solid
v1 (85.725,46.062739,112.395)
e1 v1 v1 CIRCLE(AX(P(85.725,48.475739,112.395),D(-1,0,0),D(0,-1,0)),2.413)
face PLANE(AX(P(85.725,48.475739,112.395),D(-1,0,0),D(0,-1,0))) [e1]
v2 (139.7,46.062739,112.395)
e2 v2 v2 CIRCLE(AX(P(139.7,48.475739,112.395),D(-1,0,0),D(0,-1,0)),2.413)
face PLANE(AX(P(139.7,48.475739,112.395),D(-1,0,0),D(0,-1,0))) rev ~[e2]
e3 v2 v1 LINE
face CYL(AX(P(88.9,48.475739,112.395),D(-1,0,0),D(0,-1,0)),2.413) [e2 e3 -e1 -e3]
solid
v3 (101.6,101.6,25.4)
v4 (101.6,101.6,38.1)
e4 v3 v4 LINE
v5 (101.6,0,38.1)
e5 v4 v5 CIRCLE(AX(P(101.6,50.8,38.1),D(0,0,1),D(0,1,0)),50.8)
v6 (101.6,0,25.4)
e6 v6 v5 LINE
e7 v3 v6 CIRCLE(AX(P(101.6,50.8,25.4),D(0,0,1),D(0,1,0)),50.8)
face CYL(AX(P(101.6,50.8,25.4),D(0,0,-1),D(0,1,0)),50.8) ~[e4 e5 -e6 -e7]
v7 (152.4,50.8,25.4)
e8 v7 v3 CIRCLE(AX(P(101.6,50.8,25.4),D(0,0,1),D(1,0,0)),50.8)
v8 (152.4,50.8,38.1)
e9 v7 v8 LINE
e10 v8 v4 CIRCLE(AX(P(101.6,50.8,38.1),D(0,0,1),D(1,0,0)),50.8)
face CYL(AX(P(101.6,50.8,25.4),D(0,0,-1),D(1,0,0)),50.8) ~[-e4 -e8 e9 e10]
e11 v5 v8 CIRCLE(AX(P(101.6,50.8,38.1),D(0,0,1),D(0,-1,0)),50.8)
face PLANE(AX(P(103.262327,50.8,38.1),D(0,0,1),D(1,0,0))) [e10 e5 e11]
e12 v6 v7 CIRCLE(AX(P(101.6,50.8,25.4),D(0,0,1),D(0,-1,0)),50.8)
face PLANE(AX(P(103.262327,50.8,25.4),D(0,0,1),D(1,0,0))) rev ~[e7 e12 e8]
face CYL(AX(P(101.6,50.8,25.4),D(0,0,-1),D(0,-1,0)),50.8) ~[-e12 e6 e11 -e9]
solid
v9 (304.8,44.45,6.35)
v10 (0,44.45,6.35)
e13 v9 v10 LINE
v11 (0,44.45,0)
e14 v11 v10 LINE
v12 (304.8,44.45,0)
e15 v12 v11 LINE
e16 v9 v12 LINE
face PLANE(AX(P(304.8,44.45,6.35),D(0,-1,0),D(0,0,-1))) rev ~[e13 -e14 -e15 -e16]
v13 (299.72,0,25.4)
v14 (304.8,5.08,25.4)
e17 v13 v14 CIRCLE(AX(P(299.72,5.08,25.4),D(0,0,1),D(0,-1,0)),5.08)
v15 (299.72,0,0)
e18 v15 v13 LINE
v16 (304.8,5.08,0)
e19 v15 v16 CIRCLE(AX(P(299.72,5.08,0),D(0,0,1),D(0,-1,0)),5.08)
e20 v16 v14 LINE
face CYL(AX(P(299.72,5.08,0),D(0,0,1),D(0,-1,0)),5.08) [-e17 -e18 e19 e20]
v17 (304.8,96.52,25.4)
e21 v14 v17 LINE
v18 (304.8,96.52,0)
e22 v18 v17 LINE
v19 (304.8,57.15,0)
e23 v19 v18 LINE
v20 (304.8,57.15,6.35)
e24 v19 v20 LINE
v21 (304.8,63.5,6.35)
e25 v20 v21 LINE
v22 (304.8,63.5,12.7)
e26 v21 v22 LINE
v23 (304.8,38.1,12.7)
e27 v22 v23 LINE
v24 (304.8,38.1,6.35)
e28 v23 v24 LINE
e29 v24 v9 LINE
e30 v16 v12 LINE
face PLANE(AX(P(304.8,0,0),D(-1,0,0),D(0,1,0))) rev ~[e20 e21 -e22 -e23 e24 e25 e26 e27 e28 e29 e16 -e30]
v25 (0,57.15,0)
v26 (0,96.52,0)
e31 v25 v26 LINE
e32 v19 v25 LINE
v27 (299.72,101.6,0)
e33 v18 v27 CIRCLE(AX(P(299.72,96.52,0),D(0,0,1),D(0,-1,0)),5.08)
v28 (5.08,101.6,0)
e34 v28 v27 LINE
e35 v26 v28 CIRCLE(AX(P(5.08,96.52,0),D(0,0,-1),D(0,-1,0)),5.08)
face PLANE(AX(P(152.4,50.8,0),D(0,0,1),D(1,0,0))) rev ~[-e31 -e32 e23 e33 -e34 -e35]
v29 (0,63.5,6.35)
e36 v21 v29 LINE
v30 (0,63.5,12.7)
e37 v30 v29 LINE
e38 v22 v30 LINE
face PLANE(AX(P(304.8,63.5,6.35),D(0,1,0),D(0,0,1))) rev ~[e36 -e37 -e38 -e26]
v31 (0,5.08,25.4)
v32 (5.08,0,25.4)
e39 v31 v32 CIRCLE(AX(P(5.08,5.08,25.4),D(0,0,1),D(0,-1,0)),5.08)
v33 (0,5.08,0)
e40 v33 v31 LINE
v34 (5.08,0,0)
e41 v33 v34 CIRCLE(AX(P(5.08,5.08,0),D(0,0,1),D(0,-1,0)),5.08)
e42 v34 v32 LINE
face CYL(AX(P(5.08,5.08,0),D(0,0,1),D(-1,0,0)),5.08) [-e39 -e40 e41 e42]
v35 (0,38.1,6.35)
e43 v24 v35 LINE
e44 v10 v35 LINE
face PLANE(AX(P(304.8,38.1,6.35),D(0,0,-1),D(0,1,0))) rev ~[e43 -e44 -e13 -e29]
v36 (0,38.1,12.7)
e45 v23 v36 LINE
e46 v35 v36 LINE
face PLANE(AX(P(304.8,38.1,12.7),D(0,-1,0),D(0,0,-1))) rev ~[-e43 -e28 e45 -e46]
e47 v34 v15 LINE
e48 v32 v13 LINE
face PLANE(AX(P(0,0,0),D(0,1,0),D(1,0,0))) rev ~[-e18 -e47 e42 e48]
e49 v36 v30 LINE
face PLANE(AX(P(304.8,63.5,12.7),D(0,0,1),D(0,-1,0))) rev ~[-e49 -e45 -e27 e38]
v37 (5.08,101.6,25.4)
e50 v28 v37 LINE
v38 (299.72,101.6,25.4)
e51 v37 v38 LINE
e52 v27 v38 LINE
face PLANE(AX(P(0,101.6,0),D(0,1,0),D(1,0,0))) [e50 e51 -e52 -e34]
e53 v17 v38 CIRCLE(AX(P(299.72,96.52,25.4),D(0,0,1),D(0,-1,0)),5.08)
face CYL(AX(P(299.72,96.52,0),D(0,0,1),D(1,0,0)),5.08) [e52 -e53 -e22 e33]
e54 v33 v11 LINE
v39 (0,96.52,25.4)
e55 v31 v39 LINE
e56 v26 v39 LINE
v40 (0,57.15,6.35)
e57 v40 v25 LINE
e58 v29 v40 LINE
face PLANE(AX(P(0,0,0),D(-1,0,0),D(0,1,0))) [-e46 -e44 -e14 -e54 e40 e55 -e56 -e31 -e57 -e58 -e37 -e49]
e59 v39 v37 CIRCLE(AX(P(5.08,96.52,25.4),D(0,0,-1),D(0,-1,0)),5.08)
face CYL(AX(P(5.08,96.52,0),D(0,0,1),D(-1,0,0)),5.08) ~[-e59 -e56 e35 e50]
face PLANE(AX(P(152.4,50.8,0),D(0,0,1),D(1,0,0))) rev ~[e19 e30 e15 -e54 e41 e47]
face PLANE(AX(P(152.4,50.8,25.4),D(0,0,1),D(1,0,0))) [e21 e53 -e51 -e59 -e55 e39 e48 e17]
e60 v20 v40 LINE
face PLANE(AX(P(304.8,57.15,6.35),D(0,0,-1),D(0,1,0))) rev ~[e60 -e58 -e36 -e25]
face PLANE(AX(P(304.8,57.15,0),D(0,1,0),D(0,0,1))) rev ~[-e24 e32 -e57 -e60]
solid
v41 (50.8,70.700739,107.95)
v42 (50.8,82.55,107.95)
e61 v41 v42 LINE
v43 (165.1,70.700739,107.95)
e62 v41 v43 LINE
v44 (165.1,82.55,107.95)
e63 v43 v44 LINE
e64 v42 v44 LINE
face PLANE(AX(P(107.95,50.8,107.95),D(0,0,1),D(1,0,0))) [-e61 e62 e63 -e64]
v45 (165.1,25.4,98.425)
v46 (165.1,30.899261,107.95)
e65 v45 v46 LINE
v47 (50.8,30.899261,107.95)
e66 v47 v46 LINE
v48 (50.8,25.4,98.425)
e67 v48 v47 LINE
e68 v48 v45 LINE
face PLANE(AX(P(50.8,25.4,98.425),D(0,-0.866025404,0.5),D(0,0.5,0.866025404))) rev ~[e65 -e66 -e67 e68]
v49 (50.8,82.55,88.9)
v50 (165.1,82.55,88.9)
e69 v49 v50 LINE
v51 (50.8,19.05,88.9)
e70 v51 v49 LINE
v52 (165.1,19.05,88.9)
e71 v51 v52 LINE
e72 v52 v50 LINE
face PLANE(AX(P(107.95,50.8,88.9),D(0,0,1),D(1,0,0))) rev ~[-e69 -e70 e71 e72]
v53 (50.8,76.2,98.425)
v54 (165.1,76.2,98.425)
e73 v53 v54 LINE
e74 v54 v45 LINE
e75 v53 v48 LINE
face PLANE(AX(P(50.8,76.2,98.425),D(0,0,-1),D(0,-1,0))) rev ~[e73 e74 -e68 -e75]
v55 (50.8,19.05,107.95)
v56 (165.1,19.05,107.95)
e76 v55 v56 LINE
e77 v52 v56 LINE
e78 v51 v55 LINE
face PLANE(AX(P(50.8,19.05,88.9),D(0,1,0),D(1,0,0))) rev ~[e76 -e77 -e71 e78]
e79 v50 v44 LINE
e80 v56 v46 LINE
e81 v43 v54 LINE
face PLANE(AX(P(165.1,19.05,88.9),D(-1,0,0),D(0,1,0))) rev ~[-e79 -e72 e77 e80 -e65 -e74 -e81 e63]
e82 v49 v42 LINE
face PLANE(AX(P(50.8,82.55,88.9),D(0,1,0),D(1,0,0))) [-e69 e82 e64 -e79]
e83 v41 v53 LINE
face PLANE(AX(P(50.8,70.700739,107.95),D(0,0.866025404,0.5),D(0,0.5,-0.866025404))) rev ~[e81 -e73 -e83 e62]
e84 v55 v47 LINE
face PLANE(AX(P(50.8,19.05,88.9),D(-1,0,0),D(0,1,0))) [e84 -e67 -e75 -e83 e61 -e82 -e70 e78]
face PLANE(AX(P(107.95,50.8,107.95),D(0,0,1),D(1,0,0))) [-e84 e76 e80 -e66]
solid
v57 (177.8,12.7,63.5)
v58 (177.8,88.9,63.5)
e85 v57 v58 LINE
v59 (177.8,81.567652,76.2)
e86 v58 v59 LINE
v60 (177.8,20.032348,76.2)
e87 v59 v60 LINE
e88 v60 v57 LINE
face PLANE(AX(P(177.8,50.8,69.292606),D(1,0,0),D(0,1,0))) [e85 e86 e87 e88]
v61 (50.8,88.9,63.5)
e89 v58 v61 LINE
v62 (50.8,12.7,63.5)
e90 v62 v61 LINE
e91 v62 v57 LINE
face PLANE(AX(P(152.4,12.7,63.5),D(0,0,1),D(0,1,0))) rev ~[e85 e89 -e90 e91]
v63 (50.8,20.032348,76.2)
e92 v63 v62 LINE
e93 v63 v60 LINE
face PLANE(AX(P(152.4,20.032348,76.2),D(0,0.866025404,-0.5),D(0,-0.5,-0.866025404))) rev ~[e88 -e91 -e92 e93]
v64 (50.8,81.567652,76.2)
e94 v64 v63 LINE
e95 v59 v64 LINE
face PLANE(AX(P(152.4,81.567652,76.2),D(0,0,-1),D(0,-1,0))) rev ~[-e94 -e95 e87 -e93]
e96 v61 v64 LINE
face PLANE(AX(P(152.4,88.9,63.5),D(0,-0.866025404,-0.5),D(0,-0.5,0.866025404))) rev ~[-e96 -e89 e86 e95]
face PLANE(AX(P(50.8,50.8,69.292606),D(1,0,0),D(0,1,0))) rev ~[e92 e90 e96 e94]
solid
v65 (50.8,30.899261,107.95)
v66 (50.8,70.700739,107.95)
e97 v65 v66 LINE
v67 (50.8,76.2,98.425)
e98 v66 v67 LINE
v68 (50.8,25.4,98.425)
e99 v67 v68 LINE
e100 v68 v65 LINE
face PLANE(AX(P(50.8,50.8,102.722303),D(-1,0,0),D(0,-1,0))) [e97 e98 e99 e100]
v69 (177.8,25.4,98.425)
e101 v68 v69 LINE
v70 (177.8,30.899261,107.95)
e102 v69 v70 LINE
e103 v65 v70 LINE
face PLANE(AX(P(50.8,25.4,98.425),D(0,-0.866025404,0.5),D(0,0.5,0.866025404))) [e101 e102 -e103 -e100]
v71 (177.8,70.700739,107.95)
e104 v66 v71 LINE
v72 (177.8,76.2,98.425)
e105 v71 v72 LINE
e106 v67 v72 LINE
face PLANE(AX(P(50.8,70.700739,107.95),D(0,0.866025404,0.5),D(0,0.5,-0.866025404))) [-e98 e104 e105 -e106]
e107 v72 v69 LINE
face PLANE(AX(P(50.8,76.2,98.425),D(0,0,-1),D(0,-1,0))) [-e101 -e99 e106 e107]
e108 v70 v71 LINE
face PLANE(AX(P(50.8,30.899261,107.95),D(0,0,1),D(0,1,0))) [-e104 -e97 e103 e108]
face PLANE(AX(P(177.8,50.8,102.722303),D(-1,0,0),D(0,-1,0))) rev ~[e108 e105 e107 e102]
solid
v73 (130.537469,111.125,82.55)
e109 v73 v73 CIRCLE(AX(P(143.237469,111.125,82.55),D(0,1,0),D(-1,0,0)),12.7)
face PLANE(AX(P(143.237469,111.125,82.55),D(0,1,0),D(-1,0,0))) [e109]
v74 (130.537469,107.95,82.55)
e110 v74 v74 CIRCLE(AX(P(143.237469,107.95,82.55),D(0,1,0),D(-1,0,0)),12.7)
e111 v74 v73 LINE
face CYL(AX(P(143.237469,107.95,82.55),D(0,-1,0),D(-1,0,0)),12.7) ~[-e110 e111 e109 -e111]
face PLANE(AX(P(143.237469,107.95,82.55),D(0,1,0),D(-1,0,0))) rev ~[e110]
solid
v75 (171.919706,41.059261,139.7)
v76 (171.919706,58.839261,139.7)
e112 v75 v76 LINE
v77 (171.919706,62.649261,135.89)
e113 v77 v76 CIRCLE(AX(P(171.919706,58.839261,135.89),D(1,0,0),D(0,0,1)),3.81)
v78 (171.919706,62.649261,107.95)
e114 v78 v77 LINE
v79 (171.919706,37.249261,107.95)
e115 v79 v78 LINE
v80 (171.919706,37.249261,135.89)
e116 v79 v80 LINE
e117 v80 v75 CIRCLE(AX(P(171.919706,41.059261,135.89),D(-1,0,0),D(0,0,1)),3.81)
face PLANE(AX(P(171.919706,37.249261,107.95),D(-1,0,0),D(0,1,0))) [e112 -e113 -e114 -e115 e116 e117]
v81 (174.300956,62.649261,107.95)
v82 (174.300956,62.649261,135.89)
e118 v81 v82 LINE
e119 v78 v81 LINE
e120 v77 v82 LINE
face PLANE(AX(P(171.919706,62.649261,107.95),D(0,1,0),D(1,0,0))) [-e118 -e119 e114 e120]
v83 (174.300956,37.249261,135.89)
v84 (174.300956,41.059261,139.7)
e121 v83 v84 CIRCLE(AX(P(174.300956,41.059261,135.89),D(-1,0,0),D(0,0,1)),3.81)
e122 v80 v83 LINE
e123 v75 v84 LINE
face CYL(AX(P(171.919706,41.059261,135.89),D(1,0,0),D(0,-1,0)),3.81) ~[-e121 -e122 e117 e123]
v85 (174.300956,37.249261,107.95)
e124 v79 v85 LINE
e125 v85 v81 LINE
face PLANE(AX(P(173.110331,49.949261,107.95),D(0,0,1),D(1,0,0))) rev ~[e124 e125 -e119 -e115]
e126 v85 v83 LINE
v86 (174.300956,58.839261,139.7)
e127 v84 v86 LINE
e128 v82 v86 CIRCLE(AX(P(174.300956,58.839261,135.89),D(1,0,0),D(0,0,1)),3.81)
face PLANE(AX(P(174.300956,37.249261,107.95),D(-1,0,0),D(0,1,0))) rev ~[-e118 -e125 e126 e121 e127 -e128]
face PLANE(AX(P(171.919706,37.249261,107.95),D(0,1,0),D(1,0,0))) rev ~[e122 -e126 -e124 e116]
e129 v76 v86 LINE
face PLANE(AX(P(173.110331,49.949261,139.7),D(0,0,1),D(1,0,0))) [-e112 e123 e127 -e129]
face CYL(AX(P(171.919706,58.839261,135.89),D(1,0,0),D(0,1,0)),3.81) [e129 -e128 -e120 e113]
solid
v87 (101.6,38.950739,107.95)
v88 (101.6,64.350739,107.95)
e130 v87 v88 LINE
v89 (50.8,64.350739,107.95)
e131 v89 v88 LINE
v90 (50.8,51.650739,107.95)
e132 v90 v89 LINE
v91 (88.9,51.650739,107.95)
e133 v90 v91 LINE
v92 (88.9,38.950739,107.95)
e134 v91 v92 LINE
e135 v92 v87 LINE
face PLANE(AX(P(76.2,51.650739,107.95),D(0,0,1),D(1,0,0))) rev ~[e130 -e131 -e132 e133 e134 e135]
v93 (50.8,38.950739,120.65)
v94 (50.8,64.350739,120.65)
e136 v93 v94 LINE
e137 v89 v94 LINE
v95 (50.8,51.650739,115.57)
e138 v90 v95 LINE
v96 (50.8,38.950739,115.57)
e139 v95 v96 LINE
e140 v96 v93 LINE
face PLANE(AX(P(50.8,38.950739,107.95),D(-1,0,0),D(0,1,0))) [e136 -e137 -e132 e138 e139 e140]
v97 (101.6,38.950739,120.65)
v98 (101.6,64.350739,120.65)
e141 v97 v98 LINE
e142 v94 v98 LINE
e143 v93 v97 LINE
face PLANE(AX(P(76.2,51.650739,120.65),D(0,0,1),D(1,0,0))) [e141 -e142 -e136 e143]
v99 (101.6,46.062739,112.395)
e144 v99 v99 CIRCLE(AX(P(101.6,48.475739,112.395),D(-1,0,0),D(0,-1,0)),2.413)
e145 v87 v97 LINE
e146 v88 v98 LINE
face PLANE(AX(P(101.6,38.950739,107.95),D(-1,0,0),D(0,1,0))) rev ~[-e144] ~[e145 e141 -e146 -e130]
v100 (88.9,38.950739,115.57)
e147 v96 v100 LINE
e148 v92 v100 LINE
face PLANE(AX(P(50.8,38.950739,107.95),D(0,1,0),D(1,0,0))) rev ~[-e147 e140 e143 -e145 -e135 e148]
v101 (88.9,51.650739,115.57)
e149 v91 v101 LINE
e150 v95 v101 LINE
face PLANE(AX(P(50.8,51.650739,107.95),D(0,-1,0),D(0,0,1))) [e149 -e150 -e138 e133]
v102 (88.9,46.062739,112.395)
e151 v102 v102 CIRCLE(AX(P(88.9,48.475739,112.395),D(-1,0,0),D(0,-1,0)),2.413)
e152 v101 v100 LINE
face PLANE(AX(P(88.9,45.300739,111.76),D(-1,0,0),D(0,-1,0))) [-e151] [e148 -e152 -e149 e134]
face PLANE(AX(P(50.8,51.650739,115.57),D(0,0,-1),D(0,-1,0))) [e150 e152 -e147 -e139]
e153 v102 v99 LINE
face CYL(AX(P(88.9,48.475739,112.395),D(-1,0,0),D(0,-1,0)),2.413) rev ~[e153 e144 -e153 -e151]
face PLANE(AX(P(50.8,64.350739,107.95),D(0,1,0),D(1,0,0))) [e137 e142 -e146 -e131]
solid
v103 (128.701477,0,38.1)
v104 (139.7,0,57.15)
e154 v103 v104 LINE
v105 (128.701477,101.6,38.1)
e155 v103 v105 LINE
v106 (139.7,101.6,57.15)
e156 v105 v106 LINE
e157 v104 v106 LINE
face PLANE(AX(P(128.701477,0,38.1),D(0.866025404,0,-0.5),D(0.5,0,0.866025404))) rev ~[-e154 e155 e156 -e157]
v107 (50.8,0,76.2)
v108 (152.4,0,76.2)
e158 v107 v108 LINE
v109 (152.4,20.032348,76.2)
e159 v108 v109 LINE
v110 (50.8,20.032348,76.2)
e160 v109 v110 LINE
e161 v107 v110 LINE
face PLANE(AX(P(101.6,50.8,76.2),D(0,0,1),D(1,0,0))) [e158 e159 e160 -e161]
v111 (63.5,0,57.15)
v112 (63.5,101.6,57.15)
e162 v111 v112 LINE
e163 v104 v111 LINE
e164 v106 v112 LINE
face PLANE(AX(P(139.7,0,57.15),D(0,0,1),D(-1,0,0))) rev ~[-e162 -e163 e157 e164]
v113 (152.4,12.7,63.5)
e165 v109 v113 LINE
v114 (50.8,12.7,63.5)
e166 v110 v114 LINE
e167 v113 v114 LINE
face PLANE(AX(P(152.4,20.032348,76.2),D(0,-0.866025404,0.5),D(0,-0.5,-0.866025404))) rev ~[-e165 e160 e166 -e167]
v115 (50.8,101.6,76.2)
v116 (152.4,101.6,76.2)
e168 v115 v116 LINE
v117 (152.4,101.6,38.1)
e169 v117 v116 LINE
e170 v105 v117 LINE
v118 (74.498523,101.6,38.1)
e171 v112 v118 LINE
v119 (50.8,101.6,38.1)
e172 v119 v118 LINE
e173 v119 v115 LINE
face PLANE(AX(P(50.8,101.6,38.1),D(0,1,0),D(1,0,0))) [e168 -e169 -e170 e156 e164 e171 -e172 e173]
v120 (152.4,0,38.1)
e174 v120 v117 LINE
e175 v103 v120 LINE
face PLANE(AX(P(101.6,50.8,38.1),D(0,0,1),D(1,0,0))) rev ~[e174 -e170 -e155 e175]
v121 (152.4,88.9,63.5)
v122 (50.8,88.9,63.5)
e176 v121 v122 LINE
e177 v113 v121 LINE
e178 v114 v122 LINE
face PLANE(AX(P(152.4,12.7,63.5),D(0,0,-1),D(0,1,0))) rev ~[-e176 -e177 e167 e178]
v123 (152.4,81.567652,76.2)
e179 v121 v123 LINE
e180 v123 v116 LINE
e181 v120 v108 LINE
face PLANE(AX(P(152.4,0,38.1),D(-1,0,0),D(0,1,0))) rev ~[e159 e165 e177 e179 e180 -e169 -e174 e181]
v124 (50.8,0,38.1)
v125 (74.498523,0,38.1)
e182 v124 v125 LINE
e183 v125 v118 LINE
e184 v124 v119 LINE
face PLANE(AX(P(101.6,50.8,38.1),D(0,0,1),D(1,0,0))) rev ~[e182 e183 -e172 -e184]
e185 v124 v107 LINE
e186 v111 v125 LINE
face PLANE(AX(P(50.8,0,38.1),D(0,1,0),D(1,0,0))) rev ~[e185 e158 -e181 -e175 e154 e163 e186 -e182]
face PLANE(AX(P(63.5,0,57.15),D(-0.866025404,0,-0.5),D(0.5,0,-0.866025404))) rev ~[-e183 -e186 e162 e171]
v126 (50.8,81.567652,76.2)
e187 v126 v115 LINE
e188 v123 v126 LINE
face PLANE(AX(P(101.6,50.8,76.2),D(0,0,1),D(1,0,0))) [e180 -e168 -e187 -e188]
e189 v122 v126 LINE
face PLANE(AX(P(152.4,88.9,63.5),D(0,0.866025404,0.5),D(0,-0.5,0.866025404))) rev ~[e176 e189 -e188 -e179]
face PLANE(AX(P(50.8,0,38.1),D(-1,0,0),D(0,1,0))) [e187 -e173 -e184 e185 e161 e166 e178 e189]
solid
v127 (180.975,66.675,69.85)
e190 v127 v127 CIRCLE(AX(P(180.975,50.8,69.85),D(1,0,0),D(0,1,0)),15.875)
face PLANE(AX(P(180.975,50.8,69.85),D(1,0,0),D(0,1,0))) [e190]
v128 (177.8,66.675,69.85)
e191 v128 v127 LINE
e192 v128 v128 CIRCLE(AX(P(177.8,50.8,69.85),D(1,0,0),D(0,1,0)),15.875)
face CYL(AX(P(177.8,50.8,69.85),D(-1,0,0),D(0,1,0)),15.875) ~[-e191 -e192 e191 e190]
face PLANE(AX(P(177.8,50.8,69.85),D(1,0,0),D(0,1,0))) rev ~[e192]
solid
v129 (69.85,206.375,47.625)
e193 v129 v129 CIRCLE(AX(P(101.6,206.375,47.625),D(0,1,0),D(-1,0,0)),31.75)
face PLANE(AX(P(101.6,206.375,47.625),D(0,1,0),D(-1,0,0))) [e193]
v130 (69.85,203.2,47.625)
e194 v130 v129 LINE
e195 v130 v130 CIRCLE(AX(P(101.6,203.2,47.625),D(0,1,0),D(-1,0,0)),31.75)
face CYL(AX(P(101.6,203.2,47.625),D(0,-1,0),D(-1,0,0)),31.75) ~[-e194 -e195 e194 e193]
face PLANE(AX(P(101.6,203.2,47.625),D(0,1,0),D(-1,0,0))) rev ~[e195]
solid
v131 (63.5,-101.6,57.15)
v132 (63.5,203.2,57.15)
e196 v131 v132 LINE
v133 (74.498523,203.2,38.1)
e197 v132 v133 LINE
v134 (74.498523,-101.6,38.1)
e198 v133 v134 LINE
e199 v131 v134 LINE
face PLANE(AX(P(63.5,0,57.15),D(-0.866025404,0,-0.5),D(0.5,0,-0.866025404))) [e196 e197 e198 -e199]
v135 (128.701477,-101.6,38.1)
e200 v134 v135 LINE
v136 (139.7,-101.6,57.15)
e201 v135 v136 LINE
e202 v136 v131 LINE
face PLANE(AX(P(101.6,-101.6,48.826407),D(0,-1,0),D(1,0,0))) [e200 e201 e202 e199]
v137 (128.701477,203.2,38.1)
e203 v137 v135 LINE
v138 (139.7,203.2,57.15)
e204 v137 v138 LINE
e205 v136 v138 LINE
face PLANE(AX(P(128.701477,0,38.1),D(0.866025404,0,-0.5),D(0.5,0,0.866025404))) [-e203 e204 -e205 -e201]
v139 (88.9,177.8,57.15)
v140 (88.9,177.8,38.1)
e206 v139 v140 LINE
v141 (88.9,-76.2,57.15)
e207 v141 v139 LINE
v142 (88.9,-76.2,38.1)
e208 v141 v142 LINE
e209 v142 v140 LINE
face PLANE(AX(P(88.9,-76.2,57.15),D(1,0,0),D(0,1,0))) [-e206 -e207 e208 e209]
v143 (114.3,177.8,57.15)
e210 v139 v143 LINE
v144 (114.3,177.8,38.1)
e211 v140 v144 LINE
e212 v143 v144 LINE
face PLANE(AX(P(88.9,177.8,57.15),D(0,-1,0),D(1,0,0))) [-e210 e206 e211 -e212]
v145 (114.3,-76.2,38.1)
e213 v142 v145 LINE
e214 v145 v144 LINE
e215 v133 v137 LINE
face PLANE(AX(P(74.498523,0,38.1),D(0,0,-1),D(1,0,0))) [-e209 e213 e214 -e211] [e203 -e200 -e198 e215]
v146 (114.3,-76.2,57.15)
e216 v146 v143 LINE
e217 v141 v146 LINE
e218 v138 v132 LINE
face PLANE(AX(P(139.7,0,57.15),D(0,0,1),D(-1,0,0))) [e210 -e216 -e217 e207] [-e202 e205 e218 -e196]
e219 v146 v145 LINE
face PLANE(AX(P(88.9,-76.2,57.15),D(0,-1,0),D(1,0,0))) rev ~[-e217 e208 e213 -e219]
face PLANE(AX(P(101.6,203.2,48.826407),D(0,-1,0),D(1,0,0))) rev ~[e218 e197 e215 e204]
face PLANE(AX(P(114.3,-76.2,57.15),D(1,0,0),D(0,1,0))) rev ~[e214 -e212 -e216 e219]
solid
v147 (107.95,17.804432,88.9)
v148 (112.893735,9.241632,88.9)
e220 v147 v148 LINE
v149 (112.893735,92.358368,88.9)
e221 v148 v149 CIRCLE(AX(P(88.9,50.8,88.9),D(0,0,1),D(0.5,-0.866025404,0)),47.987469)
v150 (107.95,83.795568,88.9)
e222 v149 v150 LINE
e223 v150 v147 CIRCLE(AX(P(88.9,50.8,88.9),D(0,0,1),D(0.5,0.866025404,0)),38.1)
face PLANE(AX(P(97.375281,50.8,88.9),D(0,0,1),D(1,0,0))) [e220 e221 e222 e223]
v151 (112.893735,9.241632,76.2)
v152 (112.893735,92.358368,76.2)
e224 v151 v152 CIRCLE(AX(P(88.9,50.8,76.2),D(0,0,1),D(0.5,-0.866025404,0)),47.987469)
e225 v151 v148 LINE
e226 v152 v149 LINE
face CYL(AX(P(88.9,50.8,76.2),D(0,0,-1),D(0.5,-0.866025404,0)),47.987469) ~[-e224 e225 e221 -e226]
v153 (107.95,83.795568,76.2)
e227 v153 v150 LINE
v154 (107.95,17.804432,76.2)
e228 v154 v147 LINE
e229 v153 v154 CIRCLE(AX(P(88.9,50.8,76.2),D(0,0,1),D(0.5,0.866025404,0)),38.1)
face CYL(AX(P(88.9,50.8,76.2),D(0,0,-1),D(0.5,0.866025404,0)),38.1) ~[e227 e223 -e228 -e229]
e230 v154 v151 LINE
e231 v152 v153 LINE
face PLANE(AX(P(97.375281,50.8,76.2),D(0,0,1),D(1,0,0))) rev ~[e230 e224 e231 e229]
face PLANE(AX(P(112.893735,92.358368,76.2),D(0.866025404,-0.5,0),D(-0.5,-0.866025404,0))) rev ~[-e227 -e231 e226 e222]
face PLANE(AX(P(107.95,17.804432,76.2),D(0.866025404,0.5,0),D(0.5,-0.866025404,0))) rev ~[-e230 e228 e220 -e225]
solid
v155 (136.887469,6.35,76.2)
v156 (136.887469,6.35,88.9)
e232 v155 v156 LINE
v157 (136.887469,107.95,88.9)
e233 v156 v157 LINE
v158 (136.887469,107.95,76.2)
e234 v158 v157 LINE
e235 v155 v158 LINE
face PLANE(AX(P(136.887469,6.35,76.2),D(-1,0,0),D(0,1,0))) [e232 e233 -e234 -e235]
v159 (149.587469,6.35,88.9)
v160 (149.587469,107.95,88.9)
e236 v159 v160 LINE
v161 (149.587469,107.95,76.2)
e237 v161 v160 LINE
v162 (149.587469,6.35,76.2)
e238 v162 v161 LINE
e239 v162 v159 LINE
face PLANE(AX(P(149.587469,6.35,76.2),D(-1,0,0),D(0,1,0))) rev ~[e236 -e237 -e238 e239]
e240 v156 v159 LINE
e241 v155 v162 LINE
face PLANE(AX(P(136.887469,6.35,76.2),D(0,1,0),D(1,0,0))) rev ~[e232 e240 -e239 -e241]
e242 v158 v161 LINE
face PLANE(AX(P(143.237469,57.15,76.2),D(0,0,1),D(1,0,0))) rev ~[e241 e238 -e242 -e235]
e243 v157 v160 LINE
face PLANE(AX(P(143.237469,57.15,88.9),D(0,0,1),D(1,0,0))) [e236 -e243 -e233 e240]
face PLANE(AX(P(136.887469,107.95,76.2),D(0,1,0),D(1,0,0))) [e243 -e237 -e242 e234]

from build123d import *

# Parameters (mm, degrees)
F0_W           = 304.8
F0_H           = 101.6
F1_DEPTH       = 25.4
F2_R           = 5.08
F4_DEPTH       = 304.801
F6_DEPTH       = 12.7
F7_W           = 101.6
F7_H           = 101.6
F8_DEPTH       = 38.1
F10_DEPTH      = 101.6
F12_DEPTH      = 101.6
F13_DEPTH      = 101.6
F14_DEPTH      = 203.2
F15_W          = 25.4
F15_H          = 254
F16_DEPTH      = 19.05
F17_R          = 31.75
F18_DEPTH      = 3.175
F19_DEPTH      = 101.6
F19_DEPTH_BACK = 25.4
F20_R          = 15.875
F21_DEPTH      = 3.175
F23_DEPTH      = 12.7
F24_W          = 12.7
F24_H          = 101.6
F25_DEPTH      = 12.7
F26_R          = 12.7
F27_DEPTH      = 3.175
F28_W          = 114.3
F28_H          = 63.5
F29_DEPTH      = 19.05
F31_DEPTH      = 114.3
F32_DEPTH      = 127
F33_W          = 50.8
F33_H          = 25.4
F34_DEPTH      = 12.7
F35_W          = 12.7
F35_H          = 7.62
F36_DEPTH      = 38.1
F37_R          = 2.413
F38_DEPTH      = 12.7
F39_DEPTH      = 3.175
F39_DEPTH_BACK = 50.8
F40_W          = 2.38125
F40_H          = 25.4
F41_DEPTH      = 31.75
F42_R          = 3.81


with BuildPart() as f1:
    # F0 (on Top) → F1 (new body)
    with BuildSketch(Plane.XY):
        with Locations((152.4, 50.8)):
            Rectangle(F0_W, F0_H)
    extrude(amount=F1_DEPTH)

    # F2
    f2_edges = [f1.edges().sort_by_distance(p)[0] for p in [
        (0, 0, 12.7),
        (304.8, 0, 12.7),
        (304.8, 101.6, 12.7),
        (0, 101.6, 12.7),
    ]]
    fillet(f2_edges, radius=F2_R)

    # F3 (on face) → F4 (cut, through all)
    with BuildSketch(Plane.YZ.offset(304.8)):
        Polygon((44.45, 6.35), (44.45, 0), (57.15, 0), (57.15, 6.35), (63.5, 6.35), (63.5, 12.7), (38.1, 12.7), (38.1, 6.35), align=None)
    extrude(amount=-F4_DEPTH, mode=Mode.SUBTRACT)


with BuildPart() as f6:
    # F5 (on face) → F6 (new body)
    with BuildSketch(Plane.XY.offset(25.4)):
        with BuildLine():
            ThreePointArc((101.6, 0), (137.5210244843, 14.8789755157), (152.4, 50.8))
            ThreePointArc((152.4, 50.8), (137.5210244843, 86.7210244843), (101.6, 101.6))
            ThreePointArc((101.6, 101.6), (50.8, 50.8), (101.6, 0))
        make_face()
    extrude(amount=F6_DEPTH)


with BuildPart() as f8:
    # F7 (on face) → F8 (new body)
    with BuildSketch(Plane.XY.offset(38.1)):
        with Locations((101.6, 50.8)):
            Rectangle(F7_W, F7_H)
    extrude(amount=F8_DEPTH)

    # F9 (on face) → F10 (cut, through all)
    with BuildSketch(Plane.XZ):
        Polygon((63.5, 57.15), (74.4985226281, 38.1), (128.7014773719, 38.1), (139.7, 57.15), align=None)
    extrude(amount=-F10_DEPTH, mode=Mode.SUBTRACT)

    # F11 (on face) → F12 (cut, through all)
    with BuildSketch(Plane.YZ.offset(152.4)):
        Polygon((81.5676515813, 76.2), (20.0323484187, 76.2), (12.7, 63.5), (88.9, 63.5), align=None)
    extrude(amount=-F12_DEPTH, mode=Mode.SUBTRACT)


with BuildPart() as f13:
    # F9 (on face) → F13 (new body)
    with BuildSketch(Plane.XZ):
        Polygon((63.5, 57.15), (74.4985226281, 38.1), (128.7014773719, 38.1), (139.7, 57.15), align=None)
    extrude(amount=F13_DEPTH)

    # F9 (on face) → F14 (join)
    with BuildSketch(Plane.XZ):
        Polygon((63.5, 57.15), (74.4985226281, 38.1), (128.7014773719, 38.1), (139.7, 57.15), align=None)
    extrude(amount=-F14_DEPTH)

    # F15 (on face) → F16 (cut, through all)
    with BuildSketch(Plane.XY.offset(57.15)):
        with Locations((101.6, 50.8)):
            Rectangle(F15_W, F15_H)
    extrude(amount=-F16_DEPTH, mode=Mode.SUBTRACT)


with BuildPart() as f18:
    # F17 (on face) → F18 (new body)
    with BuildSketch(Plane(origin=(0, 203.2, 0), x_dir=(-1, 0, 0), z_dir=(0, 1, 0))):
        with Locations((-101.6, 47.625)):
            Circle(F17_R)
    extrude(amount=F18_DEPTH)


with BuildPart() as f19:
    # F11 (on face) → F19 (new body, two sides)
    with BuildSketch(Plane.YZ.offset(152.4)) as f19_sk:
        Polygon((81.5676515813, 76.2), (20.0323484187, 76.2), (12.7, 63.5), (88.9, 63.5), align=None)
    extrude(amount=-F19_DEPTH)
    extrude(f19_sk.sketch, amount=F19_DEPTH_BACK)


with BuildPart() as f21:
    # F20 (on face) → F21 (new body)
    with BuildSketch(Plane.YZ.offset(177.8)):
        with Locations((50.8, 69.85)):
            Circle(F20_R)
    extrude(amount=F21_DEPTH)


with BuildPart() as f23:
    # F22 (on face) → F23 (new body)
    with BuildSketch(Plane.XY.offset(76.2)):
        with BuildLine():
            Line((112.893734675, 92.3583675204), (107.95, 83.7955678842))
            ThreePointArc((107.95, 83.7955678842), (50.8, 50.8), (107.95, 17.8044321158))
            Line((107.95, 17.8044321158), (112.893734675, 9.2416324796))
            ThreePointArc((112.893734675, 9.2416324796), (136.8874693499, 50.8), (112.893734675, 92.3583675204))
        make_face()
    extrude(amount=F23_DEPTH)


with BuildPart() as f25:
    # F24 (on face) → F25 (new body)
    with BuildSketch(Plane.XY.offset(76.2)):
        with Locations((143.2374693499, 57.15)):
            Rectangle(F24_W, F24_H)
    extrude(amount=F25_DEPTH)


with BuildPart() as f27:
    # F26 (on face) → F27 (new body)
    with BuildSketch(Plane(origin=(0, 107.95, 0), x_dir=(-1, 0, 0), z_dir=(0, 1, 0))):
        with Locations((-143.2374693499, 82.55)):
            Circle(F26_R)
    extrude(amount=F27_DEPTH)


with BuildPart() as f29:
    # F28 (on face) → F29 (new body)
    with BuildSketch(Plane.XY.offset(88.9)):
        with Locations((107.95, 50.8)):
            Rectangle(F28_W, F28_H)
    extrude(amount=F29_DEPTH)

    # F30 (on face) → F31 (cut, through all)
    with BuildSketch(Plane(origin=(50.8, 0, 0), x_dir=(0, -1, 0), z_dir=(-1, 0, 0))):
        Polygon((-30.899261314, 107.95), (-70.700738686, 107.95), (-76.2, 98.425), (-25.4, 98.425), align=None)
    extrude(amount=-F31_DEPTH, mode=Mode.SUBTRACT)


with BuildPart() as f32:
    # F30 (on face) → F32 (new body)
    with BuildSketch(Plane(origin=(50.8, 0, 0), x_dir=(0, -1, 0), z_dir=(-1, 0, 0))):
        Polygon((-30.899261314, 107.95), (-70.700738686, 107.95), (-76.2, 98.425), (-25.4, 98.425), align=None)
    extrude(amount=-F32_DEPTH)


with BuildPart() as f34:
    # F33 (on face) → F34 (new body)
    with BuildSketch(Plane.XY.offset(107.95)):
        with Locations((76.2, 51.650738686)):
            Rectangle(F33_W, F33_H)
    extrude(amount=F34_DEPTH)

    # F35 (on face) → F36 (cut)
    with BuildSketch(Plane(origin=(50.8, 0, 0), x_dir=(0, -1, 0), z_dir=(-1, 0, 0))):
        with Locations((-45.300738686, 111.76)):
            Rectangle(F35_W, F35_H)
    extrude(amount=-F36_DEPTH, mode=Mode.SUBTRACT)

    # F37 (on face) → F38 (cut, through all)
    with BuildSketch(Plane(origin=(88.9, 0, 0), x_dir=(0, -1, 0), z_dir=(-1, 0, 0))):
        with Locations((-48.475738686, 112.395)):
            Circle(F37_R)
    extrude(amount=-F38_DEPTH, mode=Mode.SUBTRACT)


with BuildPart() as f39:
    # F37 (on face) → F39 (new body, two sides)
    with BuildSketch(Plane(origin=(88.9, 0, 0), x_dir=(0, -1, 0), z_dir=(-1, 0, 0))) as f39_sk:
        with Locations((-48.475738686, 112.395)):
            Circle(F37_R)
    extrude(amount=F39_DEPTH)
    extrude(f39_sk.sketch, amount=-F39_DEPTH_BACK)


with BuildPart() as f41:
    # F40 (on face) → F41 (new body)
    with BuildSketch(Plane.XY.offset(107.95)):
        with Locations((173.1103308957, 49.949261314)):
            Rectangle(F40_W, F40_H)
    extrude(amount=F41_DEPTH)

    # F42
    f42_edges = [f41.edges().sort_by_distance(p)[0] for p in [
        (173.110331, 37.249261, 139.7),
        (173.110331, 62.649261, 139.7),
    ]]
    fillet(f42_edges, radius=F42_R)


solid = Compound([f1.part, f6.part, f8.part, f13.part, f18.part, f19.part, f21.part, f23.part, f25.part, f27.part, f29.part, f32.part, f34.part, f39.part, f41.part])
